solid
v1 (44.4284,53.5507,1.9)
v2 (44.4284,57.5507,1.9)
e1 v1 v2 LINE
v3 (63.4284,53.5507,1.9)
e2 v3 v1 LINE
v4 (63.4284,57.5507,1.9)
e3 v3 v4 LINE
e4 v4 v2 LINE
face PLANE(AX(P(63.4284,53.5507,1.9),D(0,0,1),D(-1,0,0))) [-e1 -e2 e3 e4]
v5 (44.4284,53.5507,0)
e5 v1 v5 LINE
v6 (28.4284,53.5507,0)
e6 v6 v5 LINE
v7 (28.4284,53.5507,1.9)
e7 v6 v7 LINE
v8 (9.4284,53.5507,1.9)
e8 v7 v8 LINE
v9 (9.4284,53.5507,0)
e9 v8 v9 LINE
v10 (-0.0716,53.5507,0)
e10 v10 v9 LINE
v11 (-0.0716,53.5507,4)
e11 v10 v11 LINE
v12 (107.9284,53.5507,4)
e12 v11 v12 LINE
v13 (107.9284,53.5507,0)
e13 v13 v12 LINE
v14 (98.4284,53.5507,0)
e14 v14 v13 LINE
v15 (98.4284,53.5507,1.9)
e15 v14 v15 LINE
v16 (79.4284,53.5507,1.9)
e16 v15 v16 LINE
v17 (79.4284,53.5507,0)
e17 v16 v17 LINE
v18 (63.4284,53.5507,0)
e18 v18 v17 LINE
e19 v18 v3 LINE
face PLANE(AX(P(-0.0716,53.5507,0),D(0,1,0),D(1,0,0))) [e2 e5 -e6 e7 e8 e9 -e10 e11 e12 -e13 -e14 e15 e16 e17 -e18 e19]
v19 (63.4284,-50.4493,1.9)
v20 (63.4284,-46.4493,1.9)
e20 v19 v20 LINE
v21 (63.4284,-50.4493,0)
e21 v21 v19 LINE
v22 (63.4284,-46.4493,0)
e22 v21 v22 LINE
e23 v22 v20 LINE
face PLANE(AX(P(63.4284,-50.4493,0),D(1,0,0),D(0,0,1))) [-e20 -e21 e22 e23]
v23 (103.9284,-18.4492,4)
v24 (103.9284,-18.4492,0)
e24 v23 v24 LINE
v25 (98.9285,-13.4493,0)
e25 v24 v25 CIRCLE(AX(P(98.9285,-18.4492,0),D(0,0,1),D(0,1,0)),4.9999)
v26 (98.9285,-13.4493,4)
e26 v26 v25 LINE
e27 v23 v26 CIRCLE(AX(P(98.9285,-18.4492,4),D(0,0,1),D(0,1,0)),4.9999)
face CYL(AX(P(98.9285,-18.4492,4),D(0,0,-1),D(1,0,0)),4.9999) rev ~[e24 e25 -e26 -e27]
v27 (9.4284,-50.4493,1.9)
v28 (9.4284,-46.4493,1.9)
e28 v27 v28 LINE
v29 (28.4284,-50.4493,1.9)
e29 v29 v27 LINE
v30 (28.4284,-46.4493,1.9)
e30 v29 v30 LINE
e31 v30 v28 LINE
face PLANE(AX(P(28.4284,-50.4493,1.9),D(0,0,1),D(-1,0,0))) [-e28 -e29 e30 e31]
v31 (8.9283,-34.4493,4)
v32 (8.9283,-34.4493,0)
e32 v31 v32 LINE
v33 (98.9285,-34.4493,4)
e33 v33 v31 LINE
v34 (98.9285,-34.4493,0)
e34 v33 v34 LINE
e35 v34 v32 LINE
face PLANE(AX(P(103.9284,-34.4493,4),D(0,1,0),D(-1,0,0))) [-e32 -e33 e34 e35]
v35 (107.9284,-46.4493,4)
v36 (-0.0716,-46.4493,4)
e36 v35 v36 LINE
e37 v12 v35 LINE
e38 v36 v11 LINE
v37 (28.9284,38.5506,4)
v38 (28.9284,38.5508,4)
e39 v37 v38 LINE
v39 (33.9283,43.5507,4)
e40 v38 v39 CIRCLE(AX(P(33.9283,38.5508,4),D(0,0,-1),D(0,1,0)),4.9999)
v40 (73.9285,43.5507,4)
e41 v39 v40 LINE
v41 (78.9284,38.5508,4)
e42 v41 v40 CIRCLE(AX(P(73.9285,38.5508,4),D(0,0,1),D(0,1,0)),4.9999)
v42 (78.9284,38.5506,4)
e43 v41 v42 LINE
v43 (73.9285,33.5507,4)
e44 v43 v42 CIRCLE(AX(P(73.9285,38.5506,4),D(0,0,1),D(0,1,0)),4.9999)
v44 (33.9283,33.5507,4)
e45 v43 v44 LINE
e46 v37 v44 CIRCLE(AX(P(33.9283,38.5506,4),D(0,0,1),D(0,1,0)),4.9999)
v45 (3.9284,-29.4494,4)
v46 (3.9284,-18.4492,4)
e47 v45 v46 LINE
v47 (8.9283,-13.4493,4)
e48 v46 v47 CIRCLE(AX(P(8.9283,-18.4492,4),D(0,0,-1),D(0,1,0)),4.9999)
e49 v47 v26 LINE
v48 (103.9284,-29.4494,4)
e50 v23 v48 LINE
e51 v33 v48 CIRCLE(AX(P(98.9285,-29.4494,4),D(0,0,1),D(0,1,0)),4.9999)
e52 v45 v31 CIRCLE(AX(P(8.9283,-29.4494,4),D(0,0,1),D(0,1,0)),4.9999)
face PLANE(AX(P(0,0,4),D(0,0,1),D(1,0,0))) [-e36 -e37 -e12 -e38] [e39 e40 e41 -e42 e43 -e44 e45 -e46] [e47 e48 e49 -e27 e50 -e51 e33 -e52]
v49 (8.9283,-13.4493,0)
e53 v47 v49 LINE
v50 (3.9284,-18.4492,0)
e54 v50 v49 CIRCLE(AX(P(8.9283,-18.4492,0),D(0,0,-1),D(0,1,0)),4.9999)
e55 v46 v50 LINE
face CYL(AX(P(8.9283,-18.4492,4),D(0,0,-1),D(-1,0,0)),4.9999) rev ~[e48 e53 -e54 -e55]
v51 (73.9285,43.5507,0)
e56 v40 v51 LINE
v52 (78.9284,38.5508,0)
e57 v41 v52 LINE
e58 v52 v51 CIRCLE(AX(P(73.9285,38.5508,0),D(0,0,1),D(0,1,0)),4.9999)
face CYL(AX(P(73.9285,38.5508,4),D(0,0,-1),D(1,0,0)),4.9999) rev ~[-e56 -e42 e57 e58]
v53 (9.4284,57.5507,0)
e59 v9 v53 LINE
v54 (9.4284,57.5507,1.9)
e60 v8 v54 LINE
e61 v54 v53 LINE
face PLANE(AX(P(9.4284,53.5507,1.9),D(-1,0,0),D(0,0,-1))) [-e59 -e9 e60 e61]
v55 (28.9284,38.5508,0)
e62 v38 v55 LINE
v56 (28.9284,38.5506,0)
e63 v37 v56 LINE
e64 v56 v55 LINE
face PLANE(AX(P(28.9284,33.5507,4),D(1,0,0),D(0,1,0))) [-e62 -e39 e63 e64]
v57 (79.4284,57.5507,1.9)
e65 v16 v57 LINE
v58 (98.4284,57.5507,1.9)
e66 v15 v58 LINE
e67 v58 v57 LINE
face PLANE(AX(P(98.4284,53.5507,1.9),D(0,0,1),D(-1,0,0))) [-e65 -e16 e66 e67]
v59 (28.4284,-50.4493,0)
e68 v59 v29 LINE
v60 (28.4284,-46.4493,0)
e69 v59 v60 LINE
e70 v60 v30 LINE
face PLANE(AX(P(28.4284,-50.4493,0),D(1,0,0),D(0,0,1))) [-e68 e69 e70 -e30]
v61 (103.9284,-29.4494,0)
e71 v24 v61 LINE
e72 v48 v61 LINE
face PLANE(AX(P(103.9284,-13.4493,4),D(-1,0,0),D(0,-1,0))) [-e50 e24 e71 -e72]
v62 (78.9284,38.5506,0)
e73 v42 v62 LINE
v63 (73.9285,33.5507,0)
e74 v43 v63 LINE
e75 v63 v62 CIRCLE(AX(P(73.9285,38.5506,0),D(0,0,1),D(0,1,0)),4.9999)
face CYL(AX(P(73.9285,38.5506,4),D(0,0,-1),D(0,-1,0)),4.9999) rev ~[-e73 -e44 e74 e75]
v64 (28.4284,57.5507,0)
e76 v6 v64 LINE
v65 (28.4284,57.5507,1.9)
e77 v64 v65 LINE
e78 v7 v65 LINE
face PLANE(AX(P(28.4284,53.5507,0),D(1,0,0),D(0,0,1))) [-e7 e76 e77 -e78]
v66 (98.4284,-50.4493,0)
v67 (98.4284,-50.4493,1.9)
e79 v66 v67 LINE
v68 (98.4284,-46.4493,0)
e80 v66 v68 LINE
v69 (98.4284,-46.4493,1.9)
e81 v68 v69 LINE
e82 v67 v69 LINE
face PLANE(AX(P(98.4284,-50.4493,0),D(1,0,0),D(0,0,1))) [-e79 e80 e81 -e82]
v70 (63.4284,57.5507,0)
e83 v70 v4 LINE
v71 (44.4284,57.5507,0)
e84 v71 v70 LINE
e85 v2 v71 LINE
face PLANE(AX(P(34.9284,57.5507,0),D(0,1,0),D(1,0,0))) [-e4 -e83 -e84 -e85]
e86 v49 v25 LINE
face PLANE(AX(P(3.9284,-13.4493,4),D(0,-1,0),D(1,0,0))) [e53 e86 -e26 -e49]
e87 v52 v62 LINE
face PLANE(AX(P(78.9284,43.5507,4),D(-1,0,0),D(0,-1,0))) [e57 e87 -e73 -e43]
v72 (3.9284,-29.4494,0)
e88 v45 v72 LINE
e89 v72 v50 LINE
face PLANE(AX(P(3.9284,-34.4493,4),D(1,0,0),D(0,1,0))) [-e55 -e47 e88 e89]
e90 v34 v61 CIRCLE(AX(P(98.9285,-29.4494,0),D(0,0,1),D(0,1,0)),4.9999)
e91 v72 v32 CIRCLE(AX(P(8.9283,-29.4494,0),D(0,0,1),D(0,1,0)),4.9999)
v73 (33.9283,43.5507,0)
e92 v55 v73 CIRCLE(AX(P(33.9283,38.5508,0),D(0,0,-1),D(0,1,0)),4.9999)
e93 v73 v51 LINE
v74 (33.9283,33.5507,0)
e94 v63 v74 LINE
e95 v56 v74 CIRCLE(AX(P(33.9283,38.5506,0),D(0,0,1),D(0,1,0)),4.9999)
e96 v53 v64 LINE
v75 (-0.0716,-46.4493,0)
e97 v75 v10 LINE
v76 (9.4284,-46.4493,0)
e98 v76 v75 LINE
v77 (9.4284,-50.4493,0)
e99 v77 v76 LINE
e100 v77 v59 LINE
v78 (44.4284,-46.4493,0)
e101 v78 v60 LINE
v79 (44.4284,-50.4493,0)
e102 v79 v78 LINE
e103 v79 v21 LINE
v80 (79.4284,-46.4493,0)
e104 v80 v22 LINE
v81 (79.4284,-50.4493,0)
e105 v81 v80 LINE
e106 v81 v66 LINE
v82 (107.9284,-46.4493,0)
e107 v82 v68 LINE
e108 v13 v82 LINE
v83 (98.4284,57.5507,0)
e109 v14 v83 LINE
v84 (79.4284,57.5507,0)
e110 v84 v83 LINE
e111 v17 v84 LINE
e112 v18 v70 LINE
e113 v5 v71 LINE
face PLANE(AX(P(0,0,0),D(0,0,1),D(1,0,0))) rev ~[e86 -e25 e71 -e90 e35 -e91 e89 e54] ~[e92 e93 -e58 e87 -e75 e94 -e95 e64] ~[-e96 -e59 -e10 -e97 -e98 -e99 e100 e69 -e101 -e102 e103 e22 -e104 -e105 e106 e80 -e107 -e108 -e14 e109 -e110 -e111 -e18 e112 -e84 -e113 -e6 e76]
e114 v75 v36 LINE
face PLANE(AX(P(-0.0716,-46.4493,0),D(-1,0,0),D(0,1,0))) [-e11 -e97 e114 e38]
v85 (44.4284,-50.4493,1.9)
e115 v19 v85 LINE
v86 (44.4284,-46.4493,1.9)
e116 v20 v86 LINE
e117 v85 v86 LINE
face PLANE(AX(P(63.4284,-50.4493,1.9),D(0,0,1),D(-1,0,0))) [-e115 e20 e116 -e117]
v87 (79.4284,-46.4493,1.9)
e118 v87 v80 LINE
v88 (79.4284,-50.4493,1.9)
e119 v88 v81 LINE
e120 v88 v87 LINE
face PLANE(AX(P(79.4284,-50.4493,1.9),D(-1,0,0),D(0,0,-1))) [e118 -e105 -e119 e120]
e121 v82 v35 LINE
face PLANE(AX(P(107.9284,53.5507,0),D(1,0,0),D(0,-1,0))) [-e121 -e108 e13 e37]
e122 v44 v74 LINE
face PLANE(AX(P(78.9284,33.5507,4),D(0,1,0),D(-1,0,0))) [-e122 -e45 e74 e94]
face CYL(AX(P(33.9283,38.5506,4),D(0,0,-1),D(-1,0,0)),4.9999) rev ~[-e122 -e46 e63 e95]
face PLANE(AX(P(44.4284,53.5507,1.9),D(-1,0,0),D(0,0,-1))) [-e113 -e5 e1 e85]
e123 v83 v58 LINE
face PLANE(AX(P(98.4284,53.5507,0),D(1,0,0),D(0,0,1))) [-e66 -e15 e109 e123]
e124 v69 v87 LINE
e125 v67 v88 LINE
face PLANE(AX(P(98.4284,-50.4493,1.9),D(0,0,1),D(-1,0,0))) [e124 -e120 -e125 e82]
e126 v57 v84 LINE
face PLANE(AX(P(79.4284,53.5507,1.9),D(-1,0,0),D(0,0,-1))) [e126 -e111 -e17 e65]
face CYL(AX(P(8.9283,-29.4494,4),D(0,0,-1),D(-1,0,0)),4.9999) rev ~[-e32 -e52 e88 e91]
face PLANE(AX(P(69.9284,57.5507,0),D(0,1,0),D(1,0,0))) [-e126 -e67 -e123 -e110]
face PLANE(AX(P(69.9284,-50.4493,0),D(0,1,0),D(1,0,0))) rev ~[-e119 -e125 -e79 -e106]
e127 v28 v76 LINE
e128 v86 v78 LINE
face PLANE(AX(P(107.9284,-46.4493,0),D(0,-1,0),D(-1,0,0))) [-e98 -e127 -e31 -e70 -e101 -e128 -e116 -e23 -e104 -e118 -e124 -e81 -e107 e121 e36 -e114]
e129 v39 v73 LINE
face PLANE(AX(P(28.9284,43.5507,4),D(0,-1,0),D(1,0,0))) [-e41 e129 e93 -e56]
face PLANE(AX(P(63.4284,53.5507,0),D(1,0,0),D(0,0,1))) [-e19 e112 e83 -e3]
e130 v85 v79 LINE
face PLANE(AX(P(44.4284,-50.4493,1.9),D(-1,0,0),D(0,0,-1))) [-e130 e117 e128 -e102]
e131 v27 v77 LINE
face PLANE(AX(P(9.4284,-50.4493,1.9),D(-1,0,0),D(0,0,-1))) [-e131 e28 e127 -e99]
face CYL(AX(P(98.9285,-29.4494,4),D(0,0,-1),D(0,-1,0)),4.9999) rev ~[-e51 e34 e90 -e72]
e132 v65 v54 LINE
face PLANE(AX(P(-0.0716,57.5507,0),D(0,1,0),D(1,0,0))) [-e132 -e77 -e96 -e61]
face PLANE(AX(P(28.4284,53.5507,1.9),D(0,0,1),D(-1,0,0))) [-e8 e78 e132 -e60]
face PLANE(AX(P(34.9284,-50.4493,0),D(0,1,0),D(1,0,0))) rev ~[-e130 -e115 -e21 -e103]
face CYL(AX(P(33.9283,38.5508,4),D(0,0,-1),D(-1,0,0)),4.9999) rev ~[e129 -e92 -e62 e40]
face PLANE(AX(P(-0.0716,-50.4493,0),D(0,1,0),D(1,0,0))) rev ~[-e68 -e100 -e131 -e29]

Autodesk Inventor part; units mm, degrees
ref_plane "YZ Plane" through (0, 0, 0) normal (1, 0, 0) x (0, 1, 0)
ref_plane "XZ Plane" through (0, 0, 0) normal (0, 1, 0) x (-1, 0, 0)
ref_plane "XY Plane" through (0, 0, 0) normal (0, 0, 1) x (1, 0, 0)
sketch "Sketch1" plane through (0, 0, 0) normal (0, 0, 1) x (1, 0, 0)
  line L0 (-0.0716, 53.5507) -> (107.9284, 53.5507)
  line L1 (107.9284, 53.5507) -> (107.9284, -46.4493)
  line L2 (107.9284, -46.4493) -> (-0.0716, -46.4493)
  line L3 (-0.0716, -46.4493) -> (-0.0716, 53.5507)
  point P0 (0, 0)
  dimension "d0" = 108
  dimension "d1" = 100
extrude "Extrusion1" add sketch "Sketch1" along normal blind 4
sketch "Sketch2" plane through (-0.0716, 53.5507, 0) normal (0, 1, 0) x (1, 0, 0)
  line L0 (0, 0) -> (108, 0) projected
  line L1 (9.5, 0) -> (28.5, 0)
  line L2 (28.5, 0) -> (28.5, -1.9)
  line L3 (28.5, -1.9) -> (9.5, -1.9)
  line L4 (9.5, -1.9) -> (9.5, 0)
  point P0 (0.0716, 0)
  point P1 (28.5, 0)
  dimension "d4" = 19
  dimension "d5" = 1.9
  dimension "d6" = 9.5
extrude "Extrusion2" add sketch "Sketch2" along normal blind 4
pattern_linear "Rectangular Pattern1" count 3 spacing 35 along (1, 0, 0) count 2 spacing 104 along (0, -1, 0) of "Extrusion2"
sketch "Sketch3" plane through (0, 0, 4) normal (0, 0, 1) x (1, 0, 0)
  line L0 (3.9284, -13.4493) -> (103.9284, -13.4493)
  line L1 (103.9284, -13.4493) -> (103.9284, -34.4493)
  line L2 (103.9284, -34.4493) -> (3.9284, -34.4493)
  line L3 (3.9284, -34.4493) -> (3.9284, -13.4493)
  line L4 (-0.0716, 53.5507) -> (-0.0716, -46.4493) projected
  line L5 (107.9284, 53.5507) -> (-0.0716, 53.5507) projected
  line L6 (28.9284, 43.5507) -> (78.9284, 43.5507)
  line L7 (78.9284, 43.5507) -> (78.9284, 33.5507)
  line L8 (78.9284, 33.5507) -> (28.9284, 33.5507)
  line L9 (28.9284, 33.5507) -> (28.9284, 43.5507)
  point P0 (0, 0)
  point P1 (53.9284, -13.4493)
  point P2 (53.9284, 33.5507)
  dimension "d15" = 100
  dimension "d16" = 21
  dimension "d17" = 4
  dimension "d18" = 67
  dimension "d21" = 50
  dimension "d22" = 10
  dimension "d23" = 0
  dimension "d24" = 10
extrude "Extrusion3" cut sketch "Sketch3" against normal blind 4
fillet "Fillet1" radius 5 8 edges at (3.9284, -34.4493, 2) (3.9284, -13.4493, 2) (103.9284, -13.4493, 2) (103.9284, -34.4493, 2) (78.9284, 33.5507, 2) (28.9284, 33.5507, 2) (28.9284, 43.5507, 2) (78.9284, 43.5507, 2)
properties part number "Enclosure_5"
